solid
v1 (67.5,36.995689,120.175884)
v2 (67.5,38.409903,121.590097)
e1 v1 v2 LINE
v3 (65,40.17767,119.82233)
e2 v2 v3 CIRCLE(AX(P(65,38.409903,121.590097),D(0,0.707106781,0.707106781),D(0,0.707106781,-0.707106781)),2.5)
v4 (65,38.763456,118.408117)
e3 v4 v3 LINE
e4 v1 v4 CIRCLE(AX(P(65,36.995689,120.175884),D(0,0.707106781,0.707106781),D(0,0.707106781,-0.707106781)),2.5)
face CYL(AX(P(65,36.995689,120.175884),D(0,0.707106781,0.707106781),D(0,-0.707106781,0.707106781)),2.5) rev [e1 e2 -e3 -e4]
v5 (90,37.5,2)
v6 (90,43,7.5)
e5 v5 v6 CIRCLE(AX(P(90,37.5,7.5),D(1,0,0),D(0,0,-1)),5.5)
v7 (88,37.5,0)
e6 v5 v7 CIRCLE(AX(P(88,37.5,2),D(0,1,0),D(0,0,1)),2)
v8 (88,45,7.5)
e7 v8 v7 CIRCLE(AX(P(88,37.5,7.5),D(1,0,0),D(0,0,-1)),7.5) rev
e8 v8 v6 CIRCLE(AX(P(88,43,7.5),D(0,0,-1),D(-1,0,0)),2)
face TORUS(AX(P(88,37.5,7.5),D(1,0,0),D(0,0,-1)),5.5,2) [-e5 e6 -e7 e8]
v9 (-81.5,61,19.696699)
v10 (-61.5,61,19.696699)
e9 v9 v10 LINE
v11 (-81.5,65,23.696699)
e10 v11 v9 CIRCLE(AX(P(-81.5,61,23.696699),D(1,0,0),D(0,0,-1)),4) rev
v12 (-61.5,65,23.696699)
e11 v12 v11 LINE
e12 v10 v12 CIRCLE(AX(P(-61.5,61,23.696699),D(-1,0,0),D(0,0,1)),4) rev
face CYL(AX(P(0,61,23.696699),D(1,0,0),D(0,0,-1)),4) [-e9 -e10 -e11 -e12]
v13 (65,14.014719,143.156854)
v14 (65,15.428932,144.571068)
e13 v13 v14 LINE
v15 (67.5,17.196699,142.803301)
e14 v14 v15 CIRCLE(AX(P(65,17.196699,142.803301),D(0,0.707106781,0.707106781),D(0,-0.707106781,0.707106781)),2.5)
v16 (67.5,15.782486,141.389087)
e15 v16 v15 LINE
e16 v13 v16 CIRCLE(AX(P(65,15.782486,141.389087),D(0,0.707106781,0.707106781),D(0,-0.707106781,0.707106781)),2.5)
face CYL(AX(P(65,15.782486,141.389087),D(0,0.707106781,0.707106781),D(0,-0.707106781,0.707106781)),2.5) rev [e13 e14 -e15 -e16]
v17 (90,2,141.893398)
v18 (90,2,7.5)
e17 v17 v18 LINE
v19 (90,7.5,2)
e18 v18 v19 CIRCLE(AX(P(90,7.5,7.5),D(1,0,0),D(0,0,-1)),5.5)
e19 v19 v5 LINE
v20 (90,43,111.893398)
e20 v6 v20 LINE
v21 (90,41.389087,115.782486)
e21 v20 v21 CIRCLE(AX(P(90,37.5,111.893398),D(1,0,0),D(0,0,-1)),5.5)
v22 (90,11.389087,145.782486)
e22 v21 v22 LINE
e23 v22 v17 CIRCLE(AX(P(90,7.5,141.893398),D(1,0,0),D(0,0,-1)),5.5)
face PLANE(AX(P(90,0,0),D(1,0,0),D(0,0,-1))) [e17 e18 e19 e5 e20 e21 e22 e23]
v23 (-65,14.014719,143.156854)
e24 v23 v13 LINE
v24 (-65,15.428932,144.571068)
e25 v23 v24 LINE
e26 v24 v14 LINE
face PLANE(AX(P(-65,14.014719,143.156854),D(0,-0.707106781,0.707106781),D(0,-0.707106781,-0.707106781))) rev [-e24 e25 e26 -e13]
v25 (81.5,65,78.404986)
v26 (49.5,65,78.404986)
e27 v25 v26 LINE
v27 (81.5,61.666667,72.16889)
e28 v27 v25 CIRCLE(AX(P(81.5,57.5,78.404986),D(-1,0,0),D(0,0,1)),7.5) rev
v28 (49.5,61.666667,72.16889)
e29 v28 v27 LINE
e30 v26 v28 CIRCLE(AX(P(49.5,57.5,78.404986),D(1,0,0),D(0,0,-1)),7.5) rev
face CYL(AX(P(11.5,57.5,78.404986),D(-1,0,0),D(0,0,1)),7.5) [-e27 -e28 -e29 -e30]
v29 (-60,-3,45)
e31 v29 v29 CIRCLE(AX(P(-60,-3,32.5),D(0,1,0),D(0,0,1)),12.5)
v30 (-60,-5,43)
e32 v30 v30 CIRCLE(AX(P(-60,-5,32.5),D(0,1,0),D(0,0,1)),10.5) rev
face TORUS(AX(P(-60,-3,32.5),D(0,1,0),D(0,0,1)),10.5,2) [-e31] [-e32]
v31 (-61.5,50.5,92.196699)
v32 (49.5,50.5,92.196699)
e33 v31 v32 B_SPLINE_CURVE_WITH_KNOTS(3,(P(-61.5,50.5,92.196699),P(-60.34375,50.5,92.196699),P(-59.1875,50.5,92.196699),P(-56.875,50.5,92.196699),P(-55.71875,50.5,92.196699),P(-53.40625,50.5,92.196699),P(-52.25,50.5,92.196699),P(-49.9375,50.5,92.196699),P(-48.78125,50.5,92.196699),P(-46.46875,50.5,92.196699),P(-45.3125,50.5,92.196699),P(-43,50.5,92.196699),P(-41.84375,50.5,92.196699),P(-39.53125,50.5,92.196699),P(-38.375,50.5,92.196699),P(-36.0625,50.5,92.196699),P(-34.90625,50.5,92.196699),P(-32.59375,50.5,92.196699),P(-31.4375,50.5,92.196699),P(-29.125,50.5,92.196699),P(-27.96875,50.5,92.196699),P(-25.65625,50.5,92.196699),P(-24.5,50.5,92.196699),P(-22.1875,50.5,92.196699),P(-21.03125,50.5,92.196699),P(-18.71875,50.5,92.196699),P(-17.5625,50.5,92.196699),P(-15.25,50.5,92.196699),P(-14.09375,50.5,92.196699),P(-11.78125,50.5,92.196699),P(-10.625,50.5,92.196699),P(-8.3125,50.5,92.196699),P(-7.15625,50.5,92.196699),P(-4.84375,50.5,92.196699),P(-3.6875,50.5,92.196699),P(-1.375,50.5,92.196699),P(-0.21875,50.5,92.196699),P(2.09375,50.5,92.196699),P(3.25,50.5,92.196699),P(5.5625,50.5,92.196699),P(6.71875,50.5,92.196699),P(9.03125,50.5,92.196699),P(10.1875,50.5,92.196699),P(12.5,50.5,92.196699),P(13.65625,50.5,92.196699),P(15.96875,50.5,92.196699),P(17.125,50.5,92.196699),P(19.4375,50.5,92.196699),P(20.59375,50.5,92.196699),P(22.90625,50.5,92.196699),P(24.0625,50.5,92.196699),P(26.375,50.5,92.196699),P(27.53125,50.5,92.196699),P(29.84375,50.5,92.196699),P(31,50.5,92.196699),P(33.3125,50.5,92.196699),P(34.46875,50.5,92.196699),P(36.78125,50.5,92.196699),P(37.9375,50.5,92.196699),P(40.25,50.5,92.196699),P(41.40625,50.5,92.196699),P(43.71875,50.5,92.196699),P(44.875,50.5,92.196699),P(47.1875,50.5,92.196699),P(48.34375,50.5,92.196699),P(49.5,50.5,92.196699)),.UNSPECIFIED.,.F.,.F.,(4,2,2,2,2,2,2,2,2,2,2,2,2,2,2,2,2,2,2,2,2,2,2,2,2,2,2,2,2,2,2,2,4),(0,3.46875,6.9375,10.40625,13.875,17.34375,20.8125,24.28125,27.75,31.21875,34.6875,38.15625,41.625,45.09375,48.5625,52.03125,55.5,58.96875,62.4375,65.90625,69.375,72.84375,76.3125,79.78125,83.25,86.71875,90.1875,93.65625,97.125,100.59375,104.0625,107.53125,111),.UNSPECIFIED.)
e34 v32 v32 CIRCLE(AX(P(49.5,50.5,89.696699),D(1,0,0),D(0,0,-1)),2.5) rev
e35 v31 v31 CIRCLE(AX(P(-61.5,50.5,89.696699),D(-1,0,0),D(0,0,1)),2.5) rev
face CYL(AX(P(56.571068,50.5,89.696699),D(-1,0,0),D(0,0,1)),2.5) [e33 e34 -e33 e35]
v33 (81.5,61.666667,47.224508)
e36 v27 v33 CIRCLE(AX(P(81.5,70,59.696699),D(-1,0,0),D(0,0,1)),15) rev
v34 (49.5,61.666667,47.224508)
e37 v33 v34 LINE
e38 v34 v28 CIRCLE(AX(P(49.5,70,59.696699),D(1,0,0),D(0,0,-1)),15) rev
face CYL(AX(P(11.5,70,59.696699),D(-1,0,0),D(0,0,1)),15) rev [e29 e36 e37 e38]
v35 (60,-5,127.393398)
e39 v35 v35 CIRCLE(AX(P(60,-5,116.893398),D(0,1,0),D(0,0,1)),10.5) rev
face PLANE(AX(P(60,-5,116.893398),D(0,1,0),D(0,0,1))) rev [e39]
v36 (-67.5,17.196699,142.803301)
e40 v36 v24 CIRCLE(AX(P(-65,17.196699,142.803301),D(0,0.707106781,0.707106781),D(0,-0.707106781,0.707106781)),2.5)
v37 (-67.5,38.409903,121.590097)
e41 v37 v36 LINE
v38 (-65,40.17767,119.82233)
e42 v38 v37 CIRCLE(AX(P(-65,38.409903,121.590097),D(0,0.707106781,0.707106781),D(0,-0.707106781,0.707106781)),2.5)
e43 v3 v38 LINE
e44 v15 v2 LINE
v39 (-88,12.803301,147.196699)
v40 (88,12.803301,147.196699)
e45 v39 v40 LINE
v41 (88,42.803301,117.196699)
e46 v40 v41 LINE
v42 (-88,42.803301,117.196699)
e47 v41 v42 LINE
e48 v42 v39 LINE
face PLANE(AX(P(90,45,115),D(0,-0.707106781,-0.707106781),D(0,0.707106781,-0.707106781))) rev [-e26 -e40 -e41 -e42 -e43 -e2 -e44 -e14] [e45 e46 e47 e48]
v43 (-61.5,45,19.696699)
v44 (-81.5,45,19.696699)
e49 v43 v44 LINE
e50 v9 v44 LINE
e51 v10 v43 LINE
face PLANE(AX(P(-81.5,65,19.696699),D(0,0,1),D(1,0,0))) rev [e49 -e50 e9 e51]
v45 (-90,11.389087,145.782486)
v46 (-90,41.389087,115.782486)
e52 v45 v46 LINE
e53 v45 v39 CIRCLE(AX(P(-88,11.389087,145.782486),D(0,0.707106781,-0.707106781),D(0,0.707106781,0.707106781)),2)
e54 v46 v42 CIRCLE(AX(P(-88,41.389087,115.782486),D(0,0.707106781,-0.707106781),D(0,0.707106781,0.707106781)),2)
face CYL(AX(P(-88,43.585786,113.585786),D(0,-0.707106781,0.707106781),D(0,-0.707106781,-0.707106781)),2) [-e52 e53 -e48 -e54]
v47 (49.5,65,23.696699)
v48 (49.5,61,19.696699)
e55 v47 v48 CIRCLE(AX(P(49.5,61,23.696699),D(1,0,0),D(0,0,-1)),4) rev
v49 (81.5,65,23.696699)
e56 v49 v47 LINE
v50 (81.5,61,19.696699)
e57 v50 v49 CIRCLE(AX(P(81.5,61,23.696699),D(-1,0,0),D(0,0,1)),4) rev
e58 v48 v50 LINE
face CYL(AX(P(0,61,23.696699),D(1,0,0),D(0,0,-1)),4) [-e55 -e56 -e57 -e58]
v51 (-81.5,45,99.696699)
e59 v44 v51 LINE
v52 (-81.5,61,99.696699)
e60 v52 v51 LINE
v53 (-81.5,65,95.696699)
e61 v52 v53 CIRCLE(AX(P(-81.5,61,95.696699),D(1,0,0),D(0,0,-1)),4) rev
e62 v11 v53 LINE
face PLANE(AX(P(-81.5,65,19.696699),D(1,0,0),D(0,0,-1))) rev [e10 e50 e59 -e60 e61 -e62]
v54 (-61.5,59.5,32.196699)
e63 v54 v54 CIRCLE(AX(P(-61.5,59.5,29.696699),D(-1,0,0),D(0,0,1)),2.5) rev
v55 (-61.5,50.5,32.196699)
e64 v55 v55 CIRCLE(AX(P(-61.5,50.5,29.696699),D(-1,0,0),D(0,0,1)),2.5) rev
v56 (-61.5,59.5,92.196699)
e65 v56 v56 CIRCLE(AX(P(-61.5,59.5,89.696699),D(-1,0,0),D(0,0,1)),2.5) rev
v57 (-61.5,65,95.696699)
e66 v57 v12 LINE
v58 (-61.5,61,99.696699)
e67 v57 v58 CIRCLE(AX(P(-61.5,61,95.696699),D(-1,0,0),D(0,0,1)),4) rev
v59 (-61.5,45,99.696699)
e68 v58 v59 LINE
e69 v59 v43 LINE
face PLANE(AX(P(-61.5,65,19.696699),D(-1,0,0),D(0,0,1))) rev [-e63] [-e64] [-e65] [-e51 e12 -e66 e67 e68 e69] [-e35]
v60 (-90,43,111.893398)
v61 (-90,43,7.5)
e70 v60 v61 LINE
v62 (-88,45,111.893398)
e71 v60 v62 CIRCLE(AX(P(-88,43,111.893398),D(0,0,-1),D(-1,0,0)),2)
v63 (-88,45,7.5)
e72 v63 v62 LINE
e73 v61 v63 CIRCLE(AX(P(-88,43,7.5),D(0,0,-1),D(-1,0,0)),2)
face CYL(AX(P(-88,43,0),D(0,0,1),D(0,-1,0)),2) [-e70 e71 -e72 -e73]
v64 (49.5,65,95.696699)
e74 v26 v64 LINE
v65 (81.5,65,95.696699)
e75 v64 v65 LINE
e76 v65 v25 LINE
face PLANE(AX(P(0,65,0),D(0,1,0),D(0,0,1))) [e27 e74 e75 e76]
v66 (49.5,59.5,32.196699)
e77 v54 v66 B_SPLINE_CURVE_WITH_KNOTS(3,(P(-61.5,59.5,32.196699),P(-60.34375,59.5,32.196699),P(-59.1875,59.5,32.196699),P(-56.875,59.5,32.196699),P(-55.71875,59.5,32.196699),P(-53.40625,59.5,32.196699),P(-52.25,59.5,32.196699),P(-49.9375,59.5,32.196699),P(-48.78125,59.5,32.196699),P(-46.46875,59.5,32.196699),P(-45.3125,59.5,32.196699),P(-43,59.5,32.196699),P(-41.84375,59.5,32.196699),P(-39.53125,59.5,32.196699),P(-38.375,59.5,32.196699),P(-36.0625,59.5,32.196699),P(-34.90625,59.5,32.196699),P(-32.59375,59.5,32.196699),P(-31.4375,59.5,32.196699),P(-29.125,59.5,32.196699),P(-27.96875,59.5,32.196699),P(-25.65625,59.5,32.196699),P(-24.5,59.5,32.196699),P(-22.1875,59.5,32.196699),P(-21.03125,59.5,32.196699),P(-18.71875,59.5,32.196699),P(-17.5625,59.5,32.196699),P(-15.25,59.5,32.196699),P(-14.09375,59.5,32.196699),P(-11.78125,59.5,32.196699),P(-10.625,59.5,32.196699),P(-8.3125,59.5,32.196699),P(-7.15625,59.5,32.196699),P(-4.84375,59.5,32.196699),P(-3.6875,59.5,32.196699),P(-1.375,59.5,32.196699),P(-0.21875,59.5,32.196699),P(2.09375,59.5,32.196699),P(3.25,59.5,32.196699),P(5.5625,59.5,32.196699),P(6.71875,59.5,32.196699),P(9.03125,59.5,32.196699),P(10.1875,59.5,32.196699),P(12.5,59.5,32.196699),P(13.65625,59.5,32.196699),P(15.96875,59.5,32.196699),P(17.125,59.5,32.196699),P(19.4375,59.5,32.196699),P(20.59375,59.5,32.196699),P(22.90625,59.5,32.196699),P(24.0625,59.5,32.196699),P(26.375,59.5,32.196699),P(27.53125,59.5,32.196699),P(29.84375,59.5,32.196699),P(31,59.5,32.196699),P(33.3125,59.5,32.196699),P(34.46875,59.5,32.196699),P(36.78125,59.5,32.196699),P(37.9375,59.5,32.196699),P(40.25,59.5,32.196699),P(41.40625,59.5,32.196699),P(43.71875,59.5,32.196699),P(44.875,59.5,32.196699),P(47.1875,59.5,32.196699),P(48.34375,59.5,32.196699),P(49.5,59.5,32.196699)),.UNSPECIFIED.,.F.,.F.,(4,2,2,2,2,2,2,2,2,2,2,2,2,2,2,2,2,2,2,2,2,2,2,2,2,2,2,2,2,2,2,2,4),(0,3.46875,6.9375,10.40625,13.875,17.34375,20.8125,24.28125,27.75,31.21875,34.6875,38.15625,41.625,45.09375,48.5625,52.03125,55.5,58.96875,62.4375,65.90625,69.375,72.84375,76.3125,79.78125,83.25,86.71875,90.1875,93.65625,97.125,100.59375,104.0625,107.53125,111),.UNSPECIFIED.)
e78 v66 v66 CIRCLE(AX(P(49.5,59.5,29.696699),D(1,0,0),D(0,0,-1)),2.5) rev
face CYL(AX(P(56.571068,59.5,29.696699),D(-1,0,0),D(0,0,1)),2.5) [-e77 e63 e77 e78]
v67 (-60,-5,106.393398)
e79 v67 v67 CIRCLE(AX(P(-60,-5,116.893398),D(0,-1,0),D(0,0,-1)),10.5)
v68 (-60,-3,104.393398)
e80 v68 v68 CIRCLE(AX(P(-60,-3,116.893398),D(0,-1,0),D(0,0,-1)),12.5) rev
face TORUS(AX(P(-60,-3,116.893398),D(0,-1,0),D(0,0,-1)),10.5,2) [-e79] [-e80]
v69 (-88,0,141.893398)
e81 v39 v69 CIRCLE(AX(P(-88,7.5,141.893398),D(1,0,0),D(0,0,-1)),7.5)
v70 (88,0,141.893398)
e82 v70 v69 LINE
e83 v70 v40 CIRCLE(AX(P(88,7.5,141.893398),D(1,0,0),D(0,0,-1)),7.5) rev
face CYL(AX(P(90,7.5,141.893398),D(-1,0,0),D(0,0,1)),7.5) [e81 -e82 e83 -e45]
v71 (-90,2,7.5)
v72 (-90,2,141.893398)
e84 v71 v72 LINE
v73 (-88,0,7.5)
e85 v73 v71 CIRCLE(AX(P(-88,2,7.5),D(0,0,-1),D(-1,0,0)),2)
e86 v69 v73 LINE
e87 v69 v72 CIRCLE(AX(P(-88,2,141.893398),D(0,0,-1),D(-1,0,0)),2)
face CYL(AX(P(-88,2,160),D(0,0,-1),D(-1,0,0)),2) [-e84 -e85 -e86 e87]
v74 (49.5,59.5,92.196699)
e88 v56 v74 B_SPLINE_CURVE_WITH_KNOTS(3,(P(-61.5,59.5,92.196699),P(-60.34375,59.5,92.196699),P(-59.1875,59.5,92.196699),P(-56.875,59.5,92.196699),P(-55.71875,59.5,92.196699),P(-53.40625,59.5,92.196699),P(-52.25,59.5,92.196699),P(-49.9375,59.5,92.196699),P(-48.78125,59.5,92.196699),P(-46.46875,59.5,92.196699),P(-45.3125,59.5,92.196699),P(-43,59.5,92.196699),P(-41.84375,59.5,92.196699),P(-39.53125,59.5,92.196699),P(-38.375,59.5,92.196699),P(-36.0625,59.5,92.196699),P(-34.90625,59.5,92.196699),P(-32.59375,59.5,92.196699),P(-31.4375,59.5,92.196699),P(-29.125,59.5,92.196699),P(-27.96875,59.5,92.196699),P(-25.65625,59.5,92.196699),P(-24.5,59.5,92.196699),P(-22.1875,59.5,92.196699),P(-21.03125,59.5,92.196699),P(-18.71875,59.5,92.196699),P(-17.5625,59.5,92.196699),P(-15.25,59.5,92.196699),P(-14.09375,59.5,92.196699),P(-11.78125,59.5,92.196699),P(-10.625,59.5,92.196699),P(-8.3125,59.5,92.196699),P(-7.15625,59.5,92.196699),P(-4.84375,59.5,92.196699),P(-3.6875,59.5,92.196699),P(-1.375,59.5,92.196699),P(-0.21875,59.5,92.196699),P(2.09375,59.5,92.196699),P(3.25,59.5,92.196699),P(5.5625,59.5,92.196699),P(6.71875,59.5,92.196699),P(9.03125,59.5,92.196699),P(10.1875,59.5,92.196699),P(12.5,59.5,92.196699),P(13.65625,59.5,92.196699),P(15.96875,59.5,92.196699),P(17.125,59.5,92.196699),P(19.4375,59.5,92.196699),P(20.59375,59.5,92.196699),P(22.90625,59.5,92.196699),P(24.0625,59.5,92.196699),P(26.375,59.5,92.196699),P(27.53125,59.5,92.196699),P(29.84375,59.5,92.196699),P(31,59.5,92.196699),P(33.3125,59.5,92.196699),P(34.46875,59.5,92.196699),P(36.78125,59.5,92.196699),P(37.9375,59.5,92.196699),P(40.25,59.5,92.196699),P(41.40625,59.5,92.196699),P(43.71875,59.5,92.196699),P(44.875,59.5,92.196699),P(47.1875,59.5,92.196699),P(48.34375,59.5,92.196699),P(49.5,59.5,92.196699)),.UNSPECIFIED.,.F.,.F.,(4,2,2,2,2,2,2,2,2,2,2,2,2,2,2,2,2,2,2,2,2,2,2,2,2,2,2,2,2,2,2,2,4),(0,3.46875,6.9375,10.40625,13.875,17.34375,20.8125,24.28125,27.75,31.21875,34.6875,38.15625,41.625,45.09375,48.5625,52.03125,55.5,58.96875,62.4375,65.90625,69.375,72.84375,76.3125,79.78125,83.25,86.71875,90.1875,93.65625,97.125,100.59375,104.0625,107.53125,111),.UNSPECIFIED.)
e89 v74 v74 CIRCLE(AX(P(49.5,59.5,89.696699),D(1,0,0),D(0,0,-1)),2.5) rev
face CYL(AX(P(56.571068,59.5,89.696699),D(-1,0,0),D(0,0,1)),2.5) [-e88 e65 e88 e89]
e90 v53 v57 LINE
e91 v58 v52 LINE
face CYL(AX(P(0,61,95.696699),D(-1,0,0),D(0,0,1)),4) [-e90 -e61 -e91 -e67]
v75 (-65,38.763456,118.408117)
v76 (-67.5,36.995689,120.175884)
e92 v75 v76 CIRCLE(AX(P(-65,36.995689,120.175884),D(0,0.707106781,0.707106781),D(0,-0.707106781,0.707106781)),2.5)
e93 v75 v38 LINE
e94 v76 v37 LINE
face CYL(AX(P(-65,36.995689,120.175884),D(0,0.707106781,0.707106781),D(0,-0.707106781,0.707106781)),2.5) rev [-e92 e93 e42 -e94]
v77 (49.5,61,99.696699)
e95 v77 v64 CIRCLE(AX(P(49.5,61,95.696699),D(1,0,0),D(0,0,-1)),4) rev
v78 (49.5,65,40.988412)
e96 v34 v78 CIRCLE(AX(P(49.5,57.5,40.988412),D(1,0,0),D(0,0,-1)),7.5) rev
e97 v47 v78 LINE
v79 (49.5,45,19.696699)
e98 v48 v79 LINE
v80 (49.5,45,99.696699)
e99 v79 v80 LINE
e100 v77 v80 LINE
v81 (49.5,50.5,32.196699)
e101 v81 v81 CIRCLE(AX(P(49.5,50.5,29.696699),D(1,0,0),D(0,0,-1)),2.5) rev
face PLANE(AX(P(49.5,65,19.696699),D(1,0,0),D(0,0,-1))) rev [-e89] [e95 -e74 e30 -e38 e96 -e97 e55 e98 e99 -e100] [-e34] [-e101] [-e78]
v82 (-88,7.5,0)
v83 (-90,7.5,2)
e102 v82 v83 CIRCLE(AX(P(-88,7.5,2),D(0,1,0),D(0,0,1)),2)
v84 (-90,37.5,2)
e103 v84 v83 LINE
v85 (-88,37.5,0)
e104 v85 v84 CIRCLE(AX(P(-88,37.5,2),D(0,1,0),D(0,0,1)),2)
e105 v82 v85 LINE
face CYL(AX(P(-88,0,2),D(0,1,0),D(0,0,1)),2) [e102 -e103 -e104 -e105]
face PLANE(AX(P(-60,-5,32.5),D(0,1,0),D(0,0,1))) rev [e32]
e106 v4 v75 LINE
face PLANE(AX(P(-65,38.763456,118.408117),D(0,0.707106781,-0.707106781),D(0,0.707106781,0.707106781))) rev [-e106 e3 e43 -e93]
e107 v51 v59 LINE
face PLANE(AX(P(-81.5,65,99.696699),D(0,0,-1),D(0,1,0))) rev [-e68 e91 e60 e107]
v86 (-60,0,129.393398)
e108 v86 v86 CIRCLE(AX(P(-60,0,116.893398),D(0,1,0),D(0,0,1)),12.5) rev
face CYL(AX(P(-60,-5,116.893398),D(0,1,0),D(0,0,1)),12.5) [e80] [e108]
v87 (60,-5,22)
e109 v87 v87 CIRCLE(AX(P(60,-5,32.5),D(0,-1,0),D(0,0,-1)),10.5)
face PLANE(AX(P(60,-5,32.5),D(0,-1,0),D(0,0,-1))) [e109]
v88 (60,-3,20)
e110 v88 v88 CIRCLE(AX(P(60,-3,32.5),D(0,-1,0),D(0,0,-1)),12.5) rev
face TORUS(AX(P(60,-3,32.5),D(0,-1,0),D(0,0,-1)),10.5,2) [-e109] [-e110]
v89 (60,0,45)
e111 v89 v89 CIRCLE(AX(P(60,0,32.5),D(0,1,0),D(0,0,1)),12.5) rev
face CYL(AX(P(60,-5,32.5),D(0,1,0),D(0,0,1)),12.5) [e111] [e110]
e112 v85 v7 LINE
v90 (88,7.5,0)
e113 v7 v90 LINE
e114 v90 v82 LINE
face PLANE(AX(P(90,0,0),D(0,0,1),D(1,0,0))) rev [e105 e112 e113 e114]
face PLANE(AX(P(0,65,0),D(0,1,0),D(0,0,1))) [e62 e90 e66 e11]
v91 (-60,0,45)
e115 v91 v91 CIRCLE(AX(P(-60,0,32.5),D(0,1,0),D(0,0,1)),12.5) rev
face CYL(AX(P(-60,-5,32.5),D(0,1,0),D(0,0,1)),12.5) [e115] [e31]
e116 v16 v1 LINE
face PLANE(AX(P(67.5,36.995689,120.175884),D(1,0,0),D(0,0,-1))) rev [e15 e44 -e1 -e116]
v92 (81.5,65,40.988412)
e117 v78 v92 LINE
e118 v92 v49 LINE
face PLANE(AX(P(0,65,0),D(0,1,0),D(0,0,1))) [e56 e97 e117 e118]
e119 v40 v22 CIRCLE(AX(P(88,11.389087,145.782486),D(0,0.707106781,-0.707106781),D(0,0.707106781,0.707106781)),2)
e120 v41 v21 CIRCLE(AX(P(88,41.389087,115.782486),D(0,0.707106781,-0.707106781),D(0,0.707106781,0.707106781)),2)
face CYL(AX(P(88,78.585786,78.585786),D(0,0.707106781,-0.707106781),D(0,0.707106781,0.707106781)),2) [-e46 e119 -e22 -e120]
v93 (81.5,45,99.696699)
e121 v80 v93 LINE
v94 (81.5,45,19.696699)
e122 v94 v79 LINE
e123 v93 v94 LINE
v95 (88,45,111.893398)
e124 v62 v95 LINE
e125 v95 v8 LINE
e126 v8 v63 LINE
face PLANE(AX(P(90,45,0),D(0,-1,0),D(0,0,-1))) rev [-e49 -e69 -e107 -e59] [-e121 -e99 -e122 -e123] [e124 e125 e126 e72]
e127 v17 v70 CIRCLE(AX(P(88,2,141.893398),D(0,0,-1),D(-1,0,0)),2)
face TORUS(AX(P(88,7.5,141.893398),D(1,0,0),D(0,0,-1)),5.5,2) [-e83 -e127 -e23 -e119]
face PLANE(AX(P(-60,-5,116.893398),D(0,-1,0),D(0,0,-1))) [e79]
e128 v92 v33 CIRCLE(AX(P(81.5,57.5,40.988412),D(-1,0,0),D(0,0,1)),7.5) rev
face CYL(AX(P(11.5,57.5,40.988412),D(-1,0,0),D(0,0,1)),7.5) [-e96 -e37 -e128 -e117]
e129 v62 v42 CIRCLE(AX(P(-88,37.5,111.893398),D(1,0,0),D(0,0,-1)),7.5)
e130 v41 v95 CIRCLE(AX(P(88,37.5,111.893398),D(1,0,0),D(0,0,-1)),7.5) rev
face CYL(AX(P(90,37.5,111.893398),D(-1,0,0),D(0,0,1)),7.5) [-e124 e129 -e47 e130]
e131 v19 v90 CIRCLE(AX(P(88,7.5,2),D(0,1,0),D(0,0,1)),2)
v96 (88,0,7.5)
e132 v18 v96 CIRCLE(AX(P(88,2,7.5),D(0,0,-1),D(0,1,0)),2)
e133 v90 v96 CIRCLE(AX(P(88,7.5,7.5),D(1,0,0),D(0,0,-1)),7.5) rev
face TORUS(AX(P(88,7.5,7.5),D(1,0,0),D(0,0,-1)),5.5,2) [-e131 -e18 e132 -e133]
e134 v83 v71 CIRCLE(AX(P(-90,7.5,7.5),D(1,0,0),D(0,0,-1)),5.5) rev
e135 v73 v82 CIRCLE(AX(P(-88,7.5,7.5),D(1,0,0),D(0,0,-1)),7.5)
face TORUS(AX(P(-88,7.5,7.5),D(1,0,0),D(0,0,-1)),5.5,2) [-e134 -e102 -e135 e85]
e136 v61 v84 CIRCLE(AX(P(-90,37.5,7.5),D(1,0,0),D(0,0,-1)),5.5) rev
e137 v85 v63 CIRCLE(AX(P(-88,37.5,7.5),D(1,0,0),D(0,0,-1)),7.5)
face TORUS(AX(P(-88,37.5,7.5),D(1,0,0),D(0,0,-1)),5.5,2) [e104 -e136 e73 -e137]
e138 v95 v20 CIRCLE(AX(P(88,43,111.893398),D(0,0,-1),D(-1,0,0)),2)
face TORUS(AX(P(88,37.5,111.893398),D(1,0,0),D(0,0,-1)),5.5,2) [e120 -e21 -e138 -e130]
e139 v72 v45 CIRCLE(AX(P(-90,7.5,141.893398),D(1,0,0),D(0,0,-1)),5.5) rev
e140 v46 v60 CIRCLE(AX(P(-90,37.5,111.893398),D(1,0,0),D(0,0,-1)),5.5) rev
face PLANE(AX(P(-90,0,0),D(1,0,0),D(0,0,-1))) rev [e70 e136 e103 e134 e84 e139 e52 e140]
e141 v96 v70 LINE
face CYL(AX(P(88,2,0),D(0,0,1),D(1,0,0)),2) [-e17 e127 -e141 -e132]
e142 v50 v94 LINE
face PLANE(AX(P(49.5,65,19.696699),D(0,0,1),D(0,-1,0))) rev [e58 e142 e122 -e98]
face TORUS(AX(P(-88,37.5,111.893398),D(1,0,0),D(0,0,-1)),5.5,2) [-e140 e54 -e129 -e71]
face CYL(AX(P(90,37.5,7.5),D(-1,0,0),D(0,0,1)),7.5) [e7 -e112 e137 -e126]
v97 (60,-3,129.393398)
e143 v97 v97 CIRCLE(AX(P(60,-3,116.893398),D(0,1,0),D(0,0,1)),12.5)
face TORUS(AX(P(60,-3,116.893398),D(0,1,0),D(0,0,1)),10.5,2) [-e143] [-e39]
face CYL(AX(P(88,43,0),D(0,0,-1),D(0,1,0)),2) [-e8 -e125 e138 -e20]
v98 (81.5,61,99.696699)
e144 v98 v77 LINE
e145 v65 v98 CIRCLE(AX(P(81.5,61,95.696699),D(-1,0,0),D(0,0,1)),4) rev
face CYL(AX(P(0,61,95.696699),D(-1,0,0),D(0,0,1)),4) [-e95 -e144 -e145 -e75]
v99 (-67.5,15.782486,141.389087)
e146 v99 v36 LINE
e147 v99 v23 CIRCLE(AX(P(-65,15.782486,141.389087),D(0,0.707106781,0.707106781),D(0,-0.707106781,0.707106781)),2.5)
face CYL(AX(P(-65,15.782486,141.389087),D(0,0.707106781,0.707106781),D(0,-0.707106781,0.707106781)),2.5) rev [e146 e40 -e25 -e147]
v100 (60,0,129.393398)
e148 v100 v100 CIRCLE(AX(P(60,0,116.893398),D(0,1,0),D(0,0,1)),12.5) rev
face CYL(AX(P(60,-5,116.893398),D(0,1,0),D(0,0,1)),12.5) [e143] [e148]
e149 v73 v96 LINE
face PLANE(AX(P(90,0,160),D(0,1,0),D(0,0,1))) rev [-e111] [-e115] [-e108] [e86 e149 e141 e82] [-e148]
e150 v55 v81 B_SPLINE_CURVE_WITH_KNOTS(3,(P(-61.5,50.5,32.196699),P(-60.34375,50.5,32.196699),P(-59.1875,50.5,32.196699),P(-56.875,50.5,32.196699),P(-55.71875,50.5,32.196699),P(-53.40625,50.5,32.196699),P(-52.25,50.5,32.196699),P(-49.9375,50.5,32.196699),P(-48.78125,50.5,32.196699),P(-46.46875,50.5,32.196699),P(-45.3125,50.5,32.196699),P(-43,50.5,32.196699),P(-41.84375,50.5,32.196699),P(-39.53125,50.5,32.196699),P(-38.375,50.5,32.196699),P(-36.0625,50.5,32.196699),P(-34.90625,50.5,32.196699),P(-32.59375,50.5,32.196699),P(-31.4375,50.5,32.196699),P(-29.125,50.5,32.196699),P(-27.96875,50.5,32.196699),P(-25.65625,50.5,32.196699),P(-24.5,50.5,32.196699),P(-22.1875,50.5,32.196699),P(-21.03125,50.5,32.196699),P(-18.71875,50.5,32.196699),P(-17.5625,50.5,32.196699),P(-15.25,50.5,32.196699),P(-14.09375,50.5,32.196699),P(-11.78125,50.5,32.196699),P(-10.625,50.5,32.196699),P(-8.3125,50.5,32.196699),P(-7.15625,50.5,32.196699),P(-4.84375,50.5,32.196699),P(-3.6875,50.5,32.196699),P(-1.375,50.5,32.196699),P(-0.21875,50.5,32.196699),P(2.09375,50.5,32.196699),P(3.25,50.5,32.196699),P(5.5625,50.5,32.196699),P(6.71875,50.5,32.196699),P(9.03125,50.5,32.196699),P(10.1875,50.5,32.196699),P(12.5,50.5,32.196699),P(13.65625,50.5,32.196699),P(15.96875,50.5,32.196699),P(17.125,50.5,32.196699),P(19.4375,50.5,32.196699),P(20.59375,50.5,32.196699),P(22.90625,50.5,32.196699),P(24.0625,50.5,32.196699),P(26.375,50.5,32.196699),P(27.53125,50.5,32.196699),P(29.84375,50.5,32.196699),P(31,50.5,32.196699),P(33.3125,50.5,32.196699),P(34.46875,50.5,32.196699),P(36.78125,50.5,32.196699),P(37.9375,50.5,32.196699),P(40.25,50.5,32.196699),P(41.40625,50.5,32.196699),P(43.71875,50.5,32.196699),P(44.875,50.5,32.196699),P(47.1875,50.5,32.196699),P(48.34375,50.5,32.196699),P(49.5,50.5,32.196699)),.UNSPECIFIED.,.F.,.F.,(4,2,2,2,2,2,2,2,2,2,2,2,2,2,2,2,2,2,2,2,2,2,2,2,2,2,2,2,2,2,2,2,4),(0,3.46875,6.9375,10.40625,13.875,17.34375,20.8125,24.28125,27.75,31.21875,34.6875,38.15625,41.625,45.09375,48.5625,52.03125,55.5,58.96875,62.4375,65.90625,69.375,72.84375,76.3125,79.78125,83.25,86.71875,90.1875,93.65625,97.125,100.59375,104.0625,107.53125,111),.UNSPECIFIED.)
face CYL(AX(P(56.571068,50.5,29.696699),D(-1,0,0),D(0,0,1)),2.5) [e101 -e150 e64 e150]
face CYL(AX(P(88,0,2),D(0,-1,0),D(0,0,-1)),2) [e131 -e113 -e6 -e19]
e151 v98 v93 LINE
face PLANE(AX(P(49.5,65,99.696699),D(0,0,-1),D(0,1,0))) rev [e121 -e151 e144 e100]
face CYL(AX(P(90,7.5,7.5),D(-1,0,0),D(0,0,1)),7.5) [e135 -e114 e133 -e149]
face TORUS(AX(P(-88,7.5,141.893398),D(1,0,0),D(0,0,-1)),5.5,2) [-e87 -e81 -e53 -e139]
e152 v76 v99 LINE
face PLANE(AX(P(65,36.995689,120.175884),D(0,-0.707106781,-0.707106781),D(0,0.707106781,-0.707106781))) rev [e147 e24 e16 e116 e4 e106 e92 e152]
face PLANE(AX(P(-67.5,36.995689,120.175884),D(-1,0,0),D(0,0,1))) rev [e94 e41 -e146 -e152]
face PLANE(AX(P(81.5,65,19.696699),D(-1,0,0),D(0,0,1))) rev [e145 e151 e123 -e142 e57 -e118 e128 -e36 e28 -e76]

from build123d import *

# Parameters (mm, degrees)
BOSS_EXTRUDE1_DEPTH      = 90
FILLET1_R                = 7.5
FILLET2_R                = 2
SKETCH2_W                = 20
SKETCH2_H                = 80
SKETCH2_W_2              = 32
BOSS_EXTRUDE2_DEPTH      = 20
SKETCH3_R                = 2.5
BOSS_EXTRUDE3_DEPTH      = 111
BOSS_EXTRUDE4_START      = 7.5
SKETCH4_W                = 80
SKETCH4_H                = 20
SKETCH4_R                = 3.25
BOSS_EXTRUDE4_DEPTH      = 20
MOVE_FACE1_BY            = 1.5
MOVE_FACE2_BY            = 1.5
FILLET3_R                = 4
FILLET4_R                = 4
CUT_EXTRUDE1_DEPTH       = 2
BOSS_EXTRUDE5_DEPTH      = 2
SKETCH7_W                = 58
SKETCH7_H                = 15
CUT_EXTRUDE2_DEPTH       = 0.5
SKETCH8_R                = 10
BOSS_EXTRUDE6_DEPTH      = 1.5
SKETCH10_R               = 4.25
SKETCH10_R_2             = 2.75
CUT_EXTRUDE_THIN1_DEPTH  = 1.5
SKETCH11_RX              = 5
SKETCH11_RY              = 2.5
BOSS_EXTRUDE7_DEPTH      = 1.5
LPATTERN1_COUNT          = 3
LPATTERN1_PITCH          = 24
SKETCH12_RX              = 5
SKETCH12_RY              = 2.5
BOSS_EXTRUDE8_DEPTH      = 1.5
LPATTERN2_START          = 113.13708499
LPATTERN2_DEPTH          = 1.5
FILLET7_R                = 7.5
FILLET5_R                = 5
FILLET6_R                = 2
SHELL1_T                 = -1
SKETCH14_R               = 14
BOSS_EXTRUDE9_DEPTH      = 1
BOSS_EXTRUDE10_DEPTH     = 1
BOSS_EXTRUDE11_START     = -30
BOSS_EXTRUDE11_OUTLINE_R = 13
BOSS_EXTRUDE11_DEPTH     = 10
BOSS_EXTRUDE12_REACH     = 233.484
SKETCH18_R               = 3
SKETCH17_W               = 1.5
SKETCH17_H               = 20
SKETCH17_W_2             = 20
SKETCH17_H_2             = 1.5
EXTRUDE_THIN1_DEPTH      = 63.5
SKETCH20_R               = 12.5
BOSS_EXTRUDE13_DEPTH     = 5
FILLET8_R                = 2


# Read off the part's stored shape, not the designer's step: LPattern2, Body-Move/Copy1, Boss-Extrude11
with BuildPart() as part:
    # Sketch1 → Boss-Extrude1 (new, symmetric)
    with BuildSketch(Plane(origin=(0, 0, 0), x_dir=(0, 0, -1), z_dir=(1, 0, 0))):
        Polygon((0, 0), (0, 45), (-115, 45), (-160, 0), align=None)
    extrude(amount=BOSS_EXTRUDE1_DEPTH, both=True)

    # Fillet1
    fillet1_edges = [part.edges().sort_by_distance(p)[0] for p in [
        (0, 0, 160),
        (0, 45, 115),
        (0, 45, 0),
        (0, 0, 0),
    ]]
    fillet(fillet1_edges, radius=FILLET1_R)

    # Fillet2
    fillet2_edges = [part.edges().sort_by_distance(p)[0] for p in [
        (-90, 0, 74.696699141),
        (90, 0, 74.696699141),
        (-90, 27.803300859, 132.196699141),
        (-90, 45, 59.696699141),
        (-90, 22.5, 0),
        (-90, 44.429096494, 114.763524025),
        (-90, 2.196699141, 2.196699141),
        (-90, 42.803300859, 2.196699141),
        (-90, 4.629874257, 148.822494776),
        (90, 27.803300859, 132.196699141),
        (90, 22.5, 0),
        (90, 45, 59.696699141),
        (90, 44.429096494, 114.763524025),
        (90, 2.196699141, 2.196699141),
        (90, 42.803300859, 2.196699141),
        (90, 4.629874257, 148.822494776),
    ]]
    fillet(fillet2_edges, radius=FILLET2_R)

    # Sketch2 → Boss-Extrude2 (add)
    with BuildSketch(Plane(origin=(0, 45, 0), x_dir=(1, 0, 0), z_dir=(0, 1, 0))):
        with Locations((-71.5, -59.696699141)):
            Rectangle(SKETCH2_W, SKETCH2_H)
        with Locations((65.5, -59.696699141)):
            Rectangle(SKETCH2_W_2, SKETCH2_H)
    extrude(amount=BOSS_EXTRUDE2_DEPTH)

    # Sketch3 → Boss-Extrude3 (add)
    with BuildSketch(Plane(origin=(-61.5, 0, 0), x_dir=(0, 0, -1), z_dir=(1, 0, 0))):
        with Locations(Location((-89.696699141, 59.5, 0), (0, 0, 180))):
            Circle(SKETCH3_R)
        with Locations(Location((-89.696699141, 50.5, 0), (0, 0, 180))):
            Circle(SKETCH3_R)
        with Locations(Location((-29.696699141, 50.5, 0), (0, 0, 180))):
            Circle(SKETCH3_R)
        with Locations(Location((-29.696699141, 59.5, 0), (0, 0, 180))):
            Circle(SKETCH3_R)
    extrude(amount=BOSS_EXTRUDE3_DEPTH)

    # Fillet3
    fillet3_edges = [part.edges().sort_by_distance(p)[0] for p in [
        (65.5, 65, 99.696699141),
        (65.5, 65, 19.696699141),
        (-71.5, 65, 99.696699141),
        (-71.5, 65, 19.696699141),
    ]]
    fillet(fillet3_edges, radius=FILLET3_R)

    # Sketch5 → Cut-Extrude1 (cut)
    with BuildSketch(Plane(origin=(0, 80, 80), x_dir=(1, 0, 0), z_dir=(0, 0.7071067811865511, 0.707106781186544))):
        with BuildLine():
            Line((-65, -56.317279836), (65, -56.317279836))
            ThreePointArc((65, -56.317279836), (66.767766953, -57.049512883), (67.5, -58.817279836))
            Line((67.5, -58.817279836), (67.5, -88.817279836))
            ThreePointArc((67.5, -88.817279836), (66.767766953, -90.585046789), (65, -91.317279836))
            Line((65, -91.317279836), (-65, -91.317279836))
            ThreePointArc((-65, -91.317279836), (-66.767766953, -90.585046789), (-67.5, -88.817279836))
            Line((-67.5, -88.817279836), (-67.5, -58.817279836))
            ThreePointArc((-67.5, -58.817279836), (-66.767766953, -57.049512883), (-65, -56.317279836))
        make_face()
    extrude(amount=-CUT_EXTRUDE1_DEPTH, mode=Mode.SUBTRACT)


with BuildPart() as body_2:
    # Sketch4 → Boss-Extrude4 (new body)
    with BuildSketch(Plane(origin=(-61.5, 0, 0), x_dir=(0, 0, -1), z_dir=(1, 0, 0)).offset(BOSS_EXTRUDE4_START)):
        with Locations((-59.696699141, 55)):
            Rectangle(SKETCH4_W, SKETCH4_H)
        with Locations((-89.696699141, 59.5)):
            Circle(SKETCH4_R, mode=Mode.SUBTRACT)
        with Locations((-89.696699141, 50.5)):
            Circle(SKETCH4_R, mode=Mode.SUBTRACT)
        with Locations((-29.696699141, 59.5)):
            Circle(SKETCH4_R, mode=Mode.SUBTRACT)
        with Locations((-29.696699141, 50.5)):
            Circle(SKETCH4_R, mode=Mode.SUBTRACT)
    extrude(amount=BOSS_EXTRUDE4_DEPTH)

    # Move Face1: a face moved outward by 1.5
    extrude(body_2.faces().sort_by_distance((-44, 65, 59.696699141))[0], amount=MOVE_FACE1_BY, dir=(0, 1, 0))

    # Move Face2: a face moved inward by 1.5
    extrude(body_2.faces().sort_by_distance((-44, 45, 59.696699141))[0], amount=MOVE_FACE2_BY, dir=(0, 1, 0), mode=Mode.SUBTRACT)

    # Fillet4
    fillet4_edges = [body_2.edges().sort_by_distance(p)[0] for p in [
        (-44, 66.5, 99.696699141),
        (-44, 66.5, 19.696699141),
        (-44, 46.5, 19.696699141),
        (-44, 46.5, 99.696699141),
    ]]
    fillet(fillet4_edges, radius=FILLET4_R)


with BuildPart() as body_3:
    # Sketch6 → Boss-Extrude5 (new body)
    with BuildSketch(Plane(origin=(0, 78.585786438, 78.585786438), x_dir=(1, 0, 0), z_dir=(0, 0.7071067811865509, 0.7071067811865441))):
        with BuildLine():
            Line((65, -56.317279836), (-65, -56.317279836))
            ThreePointArc((-65, -56.317279836), (-66.767766953, -57.049512883), (-67.5, -58.817279836))
            Line((-67.5, -58.817279836), (-67.5, -88.817279836))
            ThreePointArc((-67.5, -88.817279836), (-66.767766953, -90.585046789), (-65, -91.317279836))
            Line((-65, -91.317279836), (65, -91.317279836))
            ThreePointArc((65, -91.317279836), (66.767766953, -90.585046789), (67.5, -88.817279836))
            Line((67.5, -88.817279836), (67.5, -58.817279836))
            ThreePointArc((67.5, -58.817279836), (66.767766953, -57.049512883), (65, -56.317279836))
        make_face()
    extrude(amount=BOSS_EXTRUDE5_DEPTH)

    # Sketch7 → Cut-Extrude2 (cut)
    with BuildSketch(Plane(origin=(0, 80, 80), x_dir=(1, 0, 0), z_dir=(0, 0.7071067811865509, 0.7071067811865441))):
        with Locations((-28.5, -71.817279836)):
            Rectangle(SKETCH7_W, SKETCH7_H)
    extrude(amount=-CUT_EXTRUDE2_DEPTH, mode=Mode.SUBTRACT)

    # Sketch8 → Boss-Extrude6 (add)
    with BuildSketch(Plane(origin=(0, 80, 80), x_dir=(1, 0, 0), z_dir=(0, 0.7071067811865509, 0.7071067811865441))):
        with Locations(Location((15.5, -71.817279836, 0), (0, 0, 270))):
            Circle(SKETCH8_R)
    extrude(amount=BOSS_EXTRUDE6_DEPTH)

    # Sketch10 → Cut-Extrude-Thin1 (cut)
    # profile 1 of 5: a face of its own
    with BuildSketch(Plane(origin=(0, 81.060660172, 81.060660172), x_dir=(1, 0, 0), z_dir=(0, 0.7071067811865509, 0.7071067811865441))):
        with Locations((15.5, -71.817279836)):
            Circle(SKETCH10_R)
        with Locations((15.5, -71.817279836)):
            Circle(SKETCH10_R_2, mode=Mode.SUBTRACT)
    # profile 2 of 5: a face of its own
    with BuildSketch(Plane(origin=(0, 81.060660172, 81.060660172), x_dir=(1, 0, 0), z_dir=(0, 0.7071067811865509, 0.7071067811865441))):
        Polygon((7.898602102, -65.27654211), (12.49479618, -69.872736188), (13.555456352, -68.812076016), (8.959262274, -64.215881939), align=None)
    # profile 3 of 5: a face of its own
    with BuildSketch(Plane(origin=(0, 81.060660172, 81.060660172), x_dir=(1, 0, 0), z_dir=(0, 0.7071067811865509, 0.7071067811865441))):
        Polygon((22.040737726, -64.215881939), (17.444543648, -68.812076016), (18.50520382, -69.872736188), (23.101397898, -65.27654211), align=None)
    # profile 4 of 5: a face of its own
    with BuildSketch(Plane(origin=(0, 81.060660172, 81.060660172), x_dir=(1, 0, 0), z_dir=(0, 0.7071067811865509, 0.7071067811865441))):
        Polygon((17.444543648, -74.822483656), (22.040737726, -79.418677734), (23.101397898, -78.358017562), (18.50520382, -73.761823485), align=None)
    # profile 5 of 5: a face of its own
    with BuildSketch(Plane(origin=(0, 81.060660172, 81.060660172), x_dir=(1, 0, 0), z_dir=(0, 0.7071067811865509, 0.7071067811865441))):
        Polygon((12.49479618, -73.761823485), (7.898602102, -78.358017562), (8.959262274, -79.418677734), (13.555456352, -74.822483656), align=None)
    extrude(amount=-CUT_EXTRUDE_THIN1_DEPTH, mode=Mode.SUBTRACT)

    # Sketch11 → Boss-Extrude7 (add)
    with BuildSketch(Plane(origin=(0, 80, 80), x_dir=(1, 0, 0), z_dir=(0, 0.7071067811865509, 0.7071067811865441))):
        with Locations((-52.5, -85.317279836)):
            Ellipse(SKETCH11_RX, SKETCH11_RY)
    boss_extrude7 = extrude(amount=BOSS_EXTRUDE7_DEPTH)

    # LPattern1: Boss-Extrude7 ×3
    with Locations(*[(i * LPATTERN1_PITCH, 0, 0) for i in range(1, LPATTERN1_COUNT)]):
        add(boss_extrude7)

    # Sketch12 → Boss-Extrude8 (add)
    with BuildSketch(Plane(origin=(0, 80, 80), x_dir=(1, 0, 0), z_dir=(0, 0.7071067811865509, 0.7071067811865441))):
        with Locations((32.5, -66.317279836)):
            Ellipse(SKETCH12_RX, SKETCH12_RY)
    extrude(amount=BOSS_EXTRUDE8_DEPTH)

    # LPattern2 outline → LPattern2 (add)
    with BuildSketch(Plane(origin=(0, 0, 0), x_dir=(1, 0, 0), z_dir=(0, 0.707106781186551, 0.7071067811865439)).offset(LPATTERN2_START)):
        with BuildLine():
            add(Edge.make_bspline(
                [(37.5, -74.317279836), (37.5, -69.987152818), (30, -72.152216327), (22.5, -74.317279836), (30, -76.482343346), (37.5, -78.647406855), (37.5, -74.317279836)],
                knots=[0, 0, 0, 2.094395102, 2.094395102, 4.188790205, 4.188790205, 6.283185307, 6.283185307, 6.283185307], degree=2, weights=[1, 0.5, 1, 0.5, 1, 0.5, 1]))
        make_face()
        with BuildLine():
            add(Edge.make_bspline(
                [(37.5, -82.317279836), (37.5, -77.987152818), (30, -80.152216327), (22.5, -82.317279836), (30, -84.482343346), (37.5, -86.647406855), (37.5, -82.317279836)],
                knots=[0, 0, 0, 2.094395102, 2.094395102, 4.188790205, 4.188790205, 6.283185307, 6.283185307, 6.283185307], degree=2, weights=[1, 0.5, 1, 0.5, 1, 0.5, 1]))
        make_face()
        with BuildLine():
            add(Edge.make_bspline(
                [(49.5, -66.317279836), (49.5, -61.987152818), (42, -64.152216327), (34.5, -66.317279836), (42, -68.482343346), (49.5, -70.647406855), (49.5, -66.317279836)],
                knots=[0, 0, 0, 2.094395102, 2.094395102, 4.188790205, 4.188790205, 6.283185307, 6.283185307, 6.283185307], degree=2, weights=[1, 0.5, 1, 0.5, 1, 0.5, 1]))
        make_face()
        with BuildLine():
            add(Edge.make_bspline(
                [(49.5, -74.317279836), (49.5, -69.987152818), (42, -72.152216327), (34.5, -74.317279836), (42, -76.482343346), (49.5, -78.647406855), (49.5, -74.317279836)],
                knots=[0, 0, 0, 2.094395102, 2.094395102, 4.188790205, 4.188790205, 6.283185307, 6.283185307, 6.283185307], degree=2, weights=[1, 0.5, 1, 0.5, 1, 0.5, 1]))
        make_face()
        with BuildLine():
            add(Edge.make_bspline(
                [(49.5, -82.317279836), (49.5, -77.987152818), (42, -80.152216327), (34.5, -82.317279836), (42, -84.482343346), (49.5, -86.647406855), (49.5, -82.317279836)],
                knots=[0, 0, 0, 2.094395102, 2.094395102, 4.188790205, 4.188790205, 6.283185307, 6.283185307, 6.283185307], degree=2, weights=[1, 0.5, 1, 0.5, 1, 0.5, 1]))
        make_face()
        with BuildLine():
            add(Edge.make_bspline(
                [(61.5, -66.317279836), (61.5, -61.987152818), (54, -64.152216327), (46.5, -66.317279836), (54, -68.482343346), (61.5, -70.647406855), (61.5, -66.317279836)],
                knots=[0, 0, 0, 2.094395102, 2.094395102, 4.188790205, 4.188790205, 6.283185307, 6.283185307, 6.283185307], degree=2, weights=[1, 0.5, 1, 0.5, 1, 0.5, 1]))
        make_face()
        with BuildLine():
            add(Edge.make_bspline(
                [(61.5, -74.317279836), (61.5, -69.987152818), (54, -72.152216327), (46.5, -74.317279836), (54, -76.482343346), (61.5, -78.647406855), (61.5, -74.317279836)],
                knots=[0, 0, 0, 2.094395102, 2.094395102, 4.188790205, 4.188790205, 6.283185307, 6.283185307, 6.283185307], degree=2, weights=[1, 0.5, 1, 0.5, 1, 0.5, 1]))
        make_face()
        with BuildLine():
            add(Edge.make_bspline(
                [(61.5, -82.317279836), (61.5, -77.987152818), (54, -80.152216327), (46.5, -82.317279836), (54, -84.482343346), (61.5, -86.647406855), (61.5, -82.317279836)],
                knots=[0, 0, 0, 2.094395102, 2.094395102, 4.188790205, 4.188790205, 6.283185307, 6.283185307, 6.283185307], degree=2, weights=[1, 0.5, 1, 0.5, 1, 0.5, 1]))
        make_face()
    extrude(amount=LPATTERN2_DEPTH)


with BuildPart() as body_4:
    # Sketch13 → Revolve1 (revolve)
    with BuildSketch(Plane.XY.offset(59.696699141), mode=Mode.PRIVATE) as revolve1_sk:
        Polygon((11.5, 70), (11.5, 85), (105.301145933, 85), (111.5, 74.263269807), (121.5, 72.5), (121.5, 70), align=None)
    revolve(revolve1_sk.sketch.rotate(Axis((11.5, 70, 59.696699141), (1, 0, 0)), 90), axis=Axis((11.5, 70, 59.696699141), (1, 0, 0)))

    # Fillet5
    fillet5_edges = [body_4.edges().sort_by_distance(p)[0] for p in [
        (105.301145933, 70, 44.696699141),
    ]]
    fillet(fillet5_edges, radius=FILLET5_R)

    # Fillet6
    fillet6_edges = [body_4.edges().sort_by_distance(p)[0] for p in [
        (111.5, 70, 55.433429334),
    ]]
    fillet(fillet6_edges, radius=FILLET6_R)

    # Shell1
    shell1_openings = [body_4.faces().sort_by_distance(p)[0] for p in [
        (121.5, 70, 59.696699141),
        (11.5, 70, 59.696699141),
    ]]
    offset(amount=SHELL1_T, openings=shell1_openings, kind=Kind.INTERSECTION)

    # Sketch14 → Boss-Extrude9 (add)
    with BuildSketch(Plane.ZY.offset(-11.5)):
        with BuildLine():
            Line((55.696699141, 85.491933385), (40.696699141, 81.618950039))
            ThreePointArc((40.696699141, 81.618950039), (31.696699141, 70), (40.696699141, 58.381049961))
            Line((40.696699141, 58.381049961), (55.696699141, 54.508066615))
            ThreePointArc((55.696699141, 54.508066615), (59.696699141, 54), (63.696699141, 54.508066615))
            Line((63.696699141, 54.508066615), (78.696699141, 58.381049961))
            ThreePointArc((78.696699141, 58.381049961), (87.696699141, 70), (78.696699141, 81.618950039))
            Line((78.696699141, 81.618950039), (63.696699141, 85.491933385))
            ThreePointArc((63.696699141, 85.491933385), (59.696699141, 86), (55.696699141, 85.491933385))
        make_face()
        with Locations((59.696699141, 70)):
            Circle(SKETCH14_R, mode=Mode.SUBTRACT)
    extrude(amount=BOSS_EXTRUDE9_DEPTH)


with BuildPart() as body_5:
    # Body-Move/Copy1 outline → Body-Move/Copy1 (revolve)
    with BuildSketch(Plane(origin=(0, 70, 59.696699141), x_dir=(0, 1, 0), z_dir=(0, 0, -1))):
        Polygon((0, 121.5), (0, 11.5), (15, 11.5), (15, 105.301145933), (4.263269807, 111.5), (2.5, 121.5), align=None)
    revolve(axis=Axis((0, 70, 59.696699141), (1, 0, 0)))


with BuildPart() as part_1:
    add(part.part)

    # Combine1: cut body 5
    add(body_5.part, mode=Mode.SUBTRACT)

    # Fillet7
    fillet7_edges = [part_1.edges().sort_by_distance(p)[0] for p in [
        (65.5, 65, 73.838834765),
        (65.5, 65, 45.554563517),
    ]]
    fillet(fillet7_edges, radius=FILLET7_R)

    # Sketch20 → Boss-Extrude13 (add)
    with BuildSketch(Plane.XZ):
        with Locations(Location((-60, 116.893398282, 0), (0, 0, 90))):
            Circle(SKETCH20_R)
        with Locations(Location((-60, 32.5, 0), (0, 0, 90))):
            Circle(SKETCH20_R)
        with Locations(Location((60, 32.5, 0), (0, 0, 90))):
            Circle(SKETCH20_R)
        with Locations(Location((60, 116.893398282, 0), (0, 0, 90))):
            Circle(SKETCH20_R)
    extrude(amount=BOSS_EXTRUDE13_DEPTH)

    # Fillet8
    fillet8_edges = [part_1.edges().sort_by_distance(p)[0] for p in [
        (-60, -5, 104.393398282),
        (-60, -5, 20),
        (60, -5, 20),
        (60, -5, 104.393398282),
    ]]
    fillet(fillet8_edges, radius=FILLET8_R)


with BuildPart() as body_5_2:
    # Sketch15 → Boss-Extrude10 (new body)
    with BuildSketch(Plane(origin=(-34, 0, 0), x_dir=(0, 0, -1), z_dir=(1, 0, 0))):
        with BuildLine():
            Line((-63.696699141, 85.491933385), (-78.696699141, 81.618950039))
            ThreePointArc((-78.696699141, 81.618950039), (-87.696699141, 70), (-78.696699141, 58.381049961))
            Line((-78.696699141, 58.381049961), (-63.696699141, 54.508066615))
            ThreePointArc((-63.696699141, 54.508066615), (-59.696699141, 54), (-55.696699141, 54.508066615))
            Line((-55.696699141, 54.508066615), (-40.696699141, 58.381049961))
            ThreePointArc((-40.696699141, 58.381049961), (-31.696699141, 70), (-40.696699141, 81.618950039))
            Line((-40.696699141, 81.618950039), (-55.696699141, 85.491933385))
            ThreePointArc((-55.696699141, 85.491933385), (-59.696699141, 86), (-63.696699141, 85.491933385))
        make_face()
    extrude(amount=BOSS_EXTRUDE10_DEPTH)


with BuildPart() as body_6:
    # Boss-Extrude11 outline → Boss-Extrude11 (new body)
    with BuildSketch(Plane.ZY.offset(-10.5).offset(BOSS_EXTRUDE11_START)):
        with Locations((59.696699141, 70)):
            Circle(BOSS_EXTRUDE11_OUTLINE_R)
    extrude(amount=BOSS_EXTRUDE11_DEPTH)

    # Sketch18 → Boss-Extrude12 (add, up to next)
    with BuildSketch(Plane(origin=(-33, 0, 0), x_dir=(0, 0, -1), z_dir=(1, 0, 0)), mode=Mode.PRIVATE) as boss_extrude12_sk1:
        with Locations(Location((-59.696699141, 70, 0), (0, 0, 180))):
            Circle(SKETCH18_R)
    boss_extrude12_tool1 = extrude(boss_extrude12_sk1.sketch, amount=BOSS_EXTRUDE12_REACH, mode=Mode.PRIVATE) - body_6.part

    add(body_5_2.part)  # Boss-Extrude12 merges body 5 2
    add(boss_extrude12_tool1.solids().sort_by_distance((-33, 70, 59.696699))[0])

    # Sketch17 → Extrude-Thin1 (add)
    with BuildSketch(Plane(origin=(-33, 0, 0), x_dir=(0, 0, -1), z_dir=(1, 0, 0))):
        with Locations((-59.696699141, 70)):
            Rectangle(SKETCH17_W, SKETCH17_H)
        with Locations((-59.696699141, 70)):
            Rectangle(SKETCH17_W_2, SKETCH17_H_2)
    extrude(amount=EXTRUDE_THIN1_DEPTH)

    # Sketch19 → Cut-Revolve3 (revolve, cut)
    with BuildSketch(Plane.XY.offset(59.696699141), mode=Mode.PRIVATE) as cut_revolve3_sk:
        Polygon((-33, 76.452368755), (-18, 80), (-18, 81.618950039), (-33, 81.618950039), align=None)
    revolve(cut_revolve3_sk.sketch.rotate(Axis((111.5, 70, 59.696699141), (-1, 0, 0)), 270), axis=Axis((111.5, 70, 59.696699141), (-1, 0, 0)), mode=Mode.SUBTRACT)


solid = part_1.part
